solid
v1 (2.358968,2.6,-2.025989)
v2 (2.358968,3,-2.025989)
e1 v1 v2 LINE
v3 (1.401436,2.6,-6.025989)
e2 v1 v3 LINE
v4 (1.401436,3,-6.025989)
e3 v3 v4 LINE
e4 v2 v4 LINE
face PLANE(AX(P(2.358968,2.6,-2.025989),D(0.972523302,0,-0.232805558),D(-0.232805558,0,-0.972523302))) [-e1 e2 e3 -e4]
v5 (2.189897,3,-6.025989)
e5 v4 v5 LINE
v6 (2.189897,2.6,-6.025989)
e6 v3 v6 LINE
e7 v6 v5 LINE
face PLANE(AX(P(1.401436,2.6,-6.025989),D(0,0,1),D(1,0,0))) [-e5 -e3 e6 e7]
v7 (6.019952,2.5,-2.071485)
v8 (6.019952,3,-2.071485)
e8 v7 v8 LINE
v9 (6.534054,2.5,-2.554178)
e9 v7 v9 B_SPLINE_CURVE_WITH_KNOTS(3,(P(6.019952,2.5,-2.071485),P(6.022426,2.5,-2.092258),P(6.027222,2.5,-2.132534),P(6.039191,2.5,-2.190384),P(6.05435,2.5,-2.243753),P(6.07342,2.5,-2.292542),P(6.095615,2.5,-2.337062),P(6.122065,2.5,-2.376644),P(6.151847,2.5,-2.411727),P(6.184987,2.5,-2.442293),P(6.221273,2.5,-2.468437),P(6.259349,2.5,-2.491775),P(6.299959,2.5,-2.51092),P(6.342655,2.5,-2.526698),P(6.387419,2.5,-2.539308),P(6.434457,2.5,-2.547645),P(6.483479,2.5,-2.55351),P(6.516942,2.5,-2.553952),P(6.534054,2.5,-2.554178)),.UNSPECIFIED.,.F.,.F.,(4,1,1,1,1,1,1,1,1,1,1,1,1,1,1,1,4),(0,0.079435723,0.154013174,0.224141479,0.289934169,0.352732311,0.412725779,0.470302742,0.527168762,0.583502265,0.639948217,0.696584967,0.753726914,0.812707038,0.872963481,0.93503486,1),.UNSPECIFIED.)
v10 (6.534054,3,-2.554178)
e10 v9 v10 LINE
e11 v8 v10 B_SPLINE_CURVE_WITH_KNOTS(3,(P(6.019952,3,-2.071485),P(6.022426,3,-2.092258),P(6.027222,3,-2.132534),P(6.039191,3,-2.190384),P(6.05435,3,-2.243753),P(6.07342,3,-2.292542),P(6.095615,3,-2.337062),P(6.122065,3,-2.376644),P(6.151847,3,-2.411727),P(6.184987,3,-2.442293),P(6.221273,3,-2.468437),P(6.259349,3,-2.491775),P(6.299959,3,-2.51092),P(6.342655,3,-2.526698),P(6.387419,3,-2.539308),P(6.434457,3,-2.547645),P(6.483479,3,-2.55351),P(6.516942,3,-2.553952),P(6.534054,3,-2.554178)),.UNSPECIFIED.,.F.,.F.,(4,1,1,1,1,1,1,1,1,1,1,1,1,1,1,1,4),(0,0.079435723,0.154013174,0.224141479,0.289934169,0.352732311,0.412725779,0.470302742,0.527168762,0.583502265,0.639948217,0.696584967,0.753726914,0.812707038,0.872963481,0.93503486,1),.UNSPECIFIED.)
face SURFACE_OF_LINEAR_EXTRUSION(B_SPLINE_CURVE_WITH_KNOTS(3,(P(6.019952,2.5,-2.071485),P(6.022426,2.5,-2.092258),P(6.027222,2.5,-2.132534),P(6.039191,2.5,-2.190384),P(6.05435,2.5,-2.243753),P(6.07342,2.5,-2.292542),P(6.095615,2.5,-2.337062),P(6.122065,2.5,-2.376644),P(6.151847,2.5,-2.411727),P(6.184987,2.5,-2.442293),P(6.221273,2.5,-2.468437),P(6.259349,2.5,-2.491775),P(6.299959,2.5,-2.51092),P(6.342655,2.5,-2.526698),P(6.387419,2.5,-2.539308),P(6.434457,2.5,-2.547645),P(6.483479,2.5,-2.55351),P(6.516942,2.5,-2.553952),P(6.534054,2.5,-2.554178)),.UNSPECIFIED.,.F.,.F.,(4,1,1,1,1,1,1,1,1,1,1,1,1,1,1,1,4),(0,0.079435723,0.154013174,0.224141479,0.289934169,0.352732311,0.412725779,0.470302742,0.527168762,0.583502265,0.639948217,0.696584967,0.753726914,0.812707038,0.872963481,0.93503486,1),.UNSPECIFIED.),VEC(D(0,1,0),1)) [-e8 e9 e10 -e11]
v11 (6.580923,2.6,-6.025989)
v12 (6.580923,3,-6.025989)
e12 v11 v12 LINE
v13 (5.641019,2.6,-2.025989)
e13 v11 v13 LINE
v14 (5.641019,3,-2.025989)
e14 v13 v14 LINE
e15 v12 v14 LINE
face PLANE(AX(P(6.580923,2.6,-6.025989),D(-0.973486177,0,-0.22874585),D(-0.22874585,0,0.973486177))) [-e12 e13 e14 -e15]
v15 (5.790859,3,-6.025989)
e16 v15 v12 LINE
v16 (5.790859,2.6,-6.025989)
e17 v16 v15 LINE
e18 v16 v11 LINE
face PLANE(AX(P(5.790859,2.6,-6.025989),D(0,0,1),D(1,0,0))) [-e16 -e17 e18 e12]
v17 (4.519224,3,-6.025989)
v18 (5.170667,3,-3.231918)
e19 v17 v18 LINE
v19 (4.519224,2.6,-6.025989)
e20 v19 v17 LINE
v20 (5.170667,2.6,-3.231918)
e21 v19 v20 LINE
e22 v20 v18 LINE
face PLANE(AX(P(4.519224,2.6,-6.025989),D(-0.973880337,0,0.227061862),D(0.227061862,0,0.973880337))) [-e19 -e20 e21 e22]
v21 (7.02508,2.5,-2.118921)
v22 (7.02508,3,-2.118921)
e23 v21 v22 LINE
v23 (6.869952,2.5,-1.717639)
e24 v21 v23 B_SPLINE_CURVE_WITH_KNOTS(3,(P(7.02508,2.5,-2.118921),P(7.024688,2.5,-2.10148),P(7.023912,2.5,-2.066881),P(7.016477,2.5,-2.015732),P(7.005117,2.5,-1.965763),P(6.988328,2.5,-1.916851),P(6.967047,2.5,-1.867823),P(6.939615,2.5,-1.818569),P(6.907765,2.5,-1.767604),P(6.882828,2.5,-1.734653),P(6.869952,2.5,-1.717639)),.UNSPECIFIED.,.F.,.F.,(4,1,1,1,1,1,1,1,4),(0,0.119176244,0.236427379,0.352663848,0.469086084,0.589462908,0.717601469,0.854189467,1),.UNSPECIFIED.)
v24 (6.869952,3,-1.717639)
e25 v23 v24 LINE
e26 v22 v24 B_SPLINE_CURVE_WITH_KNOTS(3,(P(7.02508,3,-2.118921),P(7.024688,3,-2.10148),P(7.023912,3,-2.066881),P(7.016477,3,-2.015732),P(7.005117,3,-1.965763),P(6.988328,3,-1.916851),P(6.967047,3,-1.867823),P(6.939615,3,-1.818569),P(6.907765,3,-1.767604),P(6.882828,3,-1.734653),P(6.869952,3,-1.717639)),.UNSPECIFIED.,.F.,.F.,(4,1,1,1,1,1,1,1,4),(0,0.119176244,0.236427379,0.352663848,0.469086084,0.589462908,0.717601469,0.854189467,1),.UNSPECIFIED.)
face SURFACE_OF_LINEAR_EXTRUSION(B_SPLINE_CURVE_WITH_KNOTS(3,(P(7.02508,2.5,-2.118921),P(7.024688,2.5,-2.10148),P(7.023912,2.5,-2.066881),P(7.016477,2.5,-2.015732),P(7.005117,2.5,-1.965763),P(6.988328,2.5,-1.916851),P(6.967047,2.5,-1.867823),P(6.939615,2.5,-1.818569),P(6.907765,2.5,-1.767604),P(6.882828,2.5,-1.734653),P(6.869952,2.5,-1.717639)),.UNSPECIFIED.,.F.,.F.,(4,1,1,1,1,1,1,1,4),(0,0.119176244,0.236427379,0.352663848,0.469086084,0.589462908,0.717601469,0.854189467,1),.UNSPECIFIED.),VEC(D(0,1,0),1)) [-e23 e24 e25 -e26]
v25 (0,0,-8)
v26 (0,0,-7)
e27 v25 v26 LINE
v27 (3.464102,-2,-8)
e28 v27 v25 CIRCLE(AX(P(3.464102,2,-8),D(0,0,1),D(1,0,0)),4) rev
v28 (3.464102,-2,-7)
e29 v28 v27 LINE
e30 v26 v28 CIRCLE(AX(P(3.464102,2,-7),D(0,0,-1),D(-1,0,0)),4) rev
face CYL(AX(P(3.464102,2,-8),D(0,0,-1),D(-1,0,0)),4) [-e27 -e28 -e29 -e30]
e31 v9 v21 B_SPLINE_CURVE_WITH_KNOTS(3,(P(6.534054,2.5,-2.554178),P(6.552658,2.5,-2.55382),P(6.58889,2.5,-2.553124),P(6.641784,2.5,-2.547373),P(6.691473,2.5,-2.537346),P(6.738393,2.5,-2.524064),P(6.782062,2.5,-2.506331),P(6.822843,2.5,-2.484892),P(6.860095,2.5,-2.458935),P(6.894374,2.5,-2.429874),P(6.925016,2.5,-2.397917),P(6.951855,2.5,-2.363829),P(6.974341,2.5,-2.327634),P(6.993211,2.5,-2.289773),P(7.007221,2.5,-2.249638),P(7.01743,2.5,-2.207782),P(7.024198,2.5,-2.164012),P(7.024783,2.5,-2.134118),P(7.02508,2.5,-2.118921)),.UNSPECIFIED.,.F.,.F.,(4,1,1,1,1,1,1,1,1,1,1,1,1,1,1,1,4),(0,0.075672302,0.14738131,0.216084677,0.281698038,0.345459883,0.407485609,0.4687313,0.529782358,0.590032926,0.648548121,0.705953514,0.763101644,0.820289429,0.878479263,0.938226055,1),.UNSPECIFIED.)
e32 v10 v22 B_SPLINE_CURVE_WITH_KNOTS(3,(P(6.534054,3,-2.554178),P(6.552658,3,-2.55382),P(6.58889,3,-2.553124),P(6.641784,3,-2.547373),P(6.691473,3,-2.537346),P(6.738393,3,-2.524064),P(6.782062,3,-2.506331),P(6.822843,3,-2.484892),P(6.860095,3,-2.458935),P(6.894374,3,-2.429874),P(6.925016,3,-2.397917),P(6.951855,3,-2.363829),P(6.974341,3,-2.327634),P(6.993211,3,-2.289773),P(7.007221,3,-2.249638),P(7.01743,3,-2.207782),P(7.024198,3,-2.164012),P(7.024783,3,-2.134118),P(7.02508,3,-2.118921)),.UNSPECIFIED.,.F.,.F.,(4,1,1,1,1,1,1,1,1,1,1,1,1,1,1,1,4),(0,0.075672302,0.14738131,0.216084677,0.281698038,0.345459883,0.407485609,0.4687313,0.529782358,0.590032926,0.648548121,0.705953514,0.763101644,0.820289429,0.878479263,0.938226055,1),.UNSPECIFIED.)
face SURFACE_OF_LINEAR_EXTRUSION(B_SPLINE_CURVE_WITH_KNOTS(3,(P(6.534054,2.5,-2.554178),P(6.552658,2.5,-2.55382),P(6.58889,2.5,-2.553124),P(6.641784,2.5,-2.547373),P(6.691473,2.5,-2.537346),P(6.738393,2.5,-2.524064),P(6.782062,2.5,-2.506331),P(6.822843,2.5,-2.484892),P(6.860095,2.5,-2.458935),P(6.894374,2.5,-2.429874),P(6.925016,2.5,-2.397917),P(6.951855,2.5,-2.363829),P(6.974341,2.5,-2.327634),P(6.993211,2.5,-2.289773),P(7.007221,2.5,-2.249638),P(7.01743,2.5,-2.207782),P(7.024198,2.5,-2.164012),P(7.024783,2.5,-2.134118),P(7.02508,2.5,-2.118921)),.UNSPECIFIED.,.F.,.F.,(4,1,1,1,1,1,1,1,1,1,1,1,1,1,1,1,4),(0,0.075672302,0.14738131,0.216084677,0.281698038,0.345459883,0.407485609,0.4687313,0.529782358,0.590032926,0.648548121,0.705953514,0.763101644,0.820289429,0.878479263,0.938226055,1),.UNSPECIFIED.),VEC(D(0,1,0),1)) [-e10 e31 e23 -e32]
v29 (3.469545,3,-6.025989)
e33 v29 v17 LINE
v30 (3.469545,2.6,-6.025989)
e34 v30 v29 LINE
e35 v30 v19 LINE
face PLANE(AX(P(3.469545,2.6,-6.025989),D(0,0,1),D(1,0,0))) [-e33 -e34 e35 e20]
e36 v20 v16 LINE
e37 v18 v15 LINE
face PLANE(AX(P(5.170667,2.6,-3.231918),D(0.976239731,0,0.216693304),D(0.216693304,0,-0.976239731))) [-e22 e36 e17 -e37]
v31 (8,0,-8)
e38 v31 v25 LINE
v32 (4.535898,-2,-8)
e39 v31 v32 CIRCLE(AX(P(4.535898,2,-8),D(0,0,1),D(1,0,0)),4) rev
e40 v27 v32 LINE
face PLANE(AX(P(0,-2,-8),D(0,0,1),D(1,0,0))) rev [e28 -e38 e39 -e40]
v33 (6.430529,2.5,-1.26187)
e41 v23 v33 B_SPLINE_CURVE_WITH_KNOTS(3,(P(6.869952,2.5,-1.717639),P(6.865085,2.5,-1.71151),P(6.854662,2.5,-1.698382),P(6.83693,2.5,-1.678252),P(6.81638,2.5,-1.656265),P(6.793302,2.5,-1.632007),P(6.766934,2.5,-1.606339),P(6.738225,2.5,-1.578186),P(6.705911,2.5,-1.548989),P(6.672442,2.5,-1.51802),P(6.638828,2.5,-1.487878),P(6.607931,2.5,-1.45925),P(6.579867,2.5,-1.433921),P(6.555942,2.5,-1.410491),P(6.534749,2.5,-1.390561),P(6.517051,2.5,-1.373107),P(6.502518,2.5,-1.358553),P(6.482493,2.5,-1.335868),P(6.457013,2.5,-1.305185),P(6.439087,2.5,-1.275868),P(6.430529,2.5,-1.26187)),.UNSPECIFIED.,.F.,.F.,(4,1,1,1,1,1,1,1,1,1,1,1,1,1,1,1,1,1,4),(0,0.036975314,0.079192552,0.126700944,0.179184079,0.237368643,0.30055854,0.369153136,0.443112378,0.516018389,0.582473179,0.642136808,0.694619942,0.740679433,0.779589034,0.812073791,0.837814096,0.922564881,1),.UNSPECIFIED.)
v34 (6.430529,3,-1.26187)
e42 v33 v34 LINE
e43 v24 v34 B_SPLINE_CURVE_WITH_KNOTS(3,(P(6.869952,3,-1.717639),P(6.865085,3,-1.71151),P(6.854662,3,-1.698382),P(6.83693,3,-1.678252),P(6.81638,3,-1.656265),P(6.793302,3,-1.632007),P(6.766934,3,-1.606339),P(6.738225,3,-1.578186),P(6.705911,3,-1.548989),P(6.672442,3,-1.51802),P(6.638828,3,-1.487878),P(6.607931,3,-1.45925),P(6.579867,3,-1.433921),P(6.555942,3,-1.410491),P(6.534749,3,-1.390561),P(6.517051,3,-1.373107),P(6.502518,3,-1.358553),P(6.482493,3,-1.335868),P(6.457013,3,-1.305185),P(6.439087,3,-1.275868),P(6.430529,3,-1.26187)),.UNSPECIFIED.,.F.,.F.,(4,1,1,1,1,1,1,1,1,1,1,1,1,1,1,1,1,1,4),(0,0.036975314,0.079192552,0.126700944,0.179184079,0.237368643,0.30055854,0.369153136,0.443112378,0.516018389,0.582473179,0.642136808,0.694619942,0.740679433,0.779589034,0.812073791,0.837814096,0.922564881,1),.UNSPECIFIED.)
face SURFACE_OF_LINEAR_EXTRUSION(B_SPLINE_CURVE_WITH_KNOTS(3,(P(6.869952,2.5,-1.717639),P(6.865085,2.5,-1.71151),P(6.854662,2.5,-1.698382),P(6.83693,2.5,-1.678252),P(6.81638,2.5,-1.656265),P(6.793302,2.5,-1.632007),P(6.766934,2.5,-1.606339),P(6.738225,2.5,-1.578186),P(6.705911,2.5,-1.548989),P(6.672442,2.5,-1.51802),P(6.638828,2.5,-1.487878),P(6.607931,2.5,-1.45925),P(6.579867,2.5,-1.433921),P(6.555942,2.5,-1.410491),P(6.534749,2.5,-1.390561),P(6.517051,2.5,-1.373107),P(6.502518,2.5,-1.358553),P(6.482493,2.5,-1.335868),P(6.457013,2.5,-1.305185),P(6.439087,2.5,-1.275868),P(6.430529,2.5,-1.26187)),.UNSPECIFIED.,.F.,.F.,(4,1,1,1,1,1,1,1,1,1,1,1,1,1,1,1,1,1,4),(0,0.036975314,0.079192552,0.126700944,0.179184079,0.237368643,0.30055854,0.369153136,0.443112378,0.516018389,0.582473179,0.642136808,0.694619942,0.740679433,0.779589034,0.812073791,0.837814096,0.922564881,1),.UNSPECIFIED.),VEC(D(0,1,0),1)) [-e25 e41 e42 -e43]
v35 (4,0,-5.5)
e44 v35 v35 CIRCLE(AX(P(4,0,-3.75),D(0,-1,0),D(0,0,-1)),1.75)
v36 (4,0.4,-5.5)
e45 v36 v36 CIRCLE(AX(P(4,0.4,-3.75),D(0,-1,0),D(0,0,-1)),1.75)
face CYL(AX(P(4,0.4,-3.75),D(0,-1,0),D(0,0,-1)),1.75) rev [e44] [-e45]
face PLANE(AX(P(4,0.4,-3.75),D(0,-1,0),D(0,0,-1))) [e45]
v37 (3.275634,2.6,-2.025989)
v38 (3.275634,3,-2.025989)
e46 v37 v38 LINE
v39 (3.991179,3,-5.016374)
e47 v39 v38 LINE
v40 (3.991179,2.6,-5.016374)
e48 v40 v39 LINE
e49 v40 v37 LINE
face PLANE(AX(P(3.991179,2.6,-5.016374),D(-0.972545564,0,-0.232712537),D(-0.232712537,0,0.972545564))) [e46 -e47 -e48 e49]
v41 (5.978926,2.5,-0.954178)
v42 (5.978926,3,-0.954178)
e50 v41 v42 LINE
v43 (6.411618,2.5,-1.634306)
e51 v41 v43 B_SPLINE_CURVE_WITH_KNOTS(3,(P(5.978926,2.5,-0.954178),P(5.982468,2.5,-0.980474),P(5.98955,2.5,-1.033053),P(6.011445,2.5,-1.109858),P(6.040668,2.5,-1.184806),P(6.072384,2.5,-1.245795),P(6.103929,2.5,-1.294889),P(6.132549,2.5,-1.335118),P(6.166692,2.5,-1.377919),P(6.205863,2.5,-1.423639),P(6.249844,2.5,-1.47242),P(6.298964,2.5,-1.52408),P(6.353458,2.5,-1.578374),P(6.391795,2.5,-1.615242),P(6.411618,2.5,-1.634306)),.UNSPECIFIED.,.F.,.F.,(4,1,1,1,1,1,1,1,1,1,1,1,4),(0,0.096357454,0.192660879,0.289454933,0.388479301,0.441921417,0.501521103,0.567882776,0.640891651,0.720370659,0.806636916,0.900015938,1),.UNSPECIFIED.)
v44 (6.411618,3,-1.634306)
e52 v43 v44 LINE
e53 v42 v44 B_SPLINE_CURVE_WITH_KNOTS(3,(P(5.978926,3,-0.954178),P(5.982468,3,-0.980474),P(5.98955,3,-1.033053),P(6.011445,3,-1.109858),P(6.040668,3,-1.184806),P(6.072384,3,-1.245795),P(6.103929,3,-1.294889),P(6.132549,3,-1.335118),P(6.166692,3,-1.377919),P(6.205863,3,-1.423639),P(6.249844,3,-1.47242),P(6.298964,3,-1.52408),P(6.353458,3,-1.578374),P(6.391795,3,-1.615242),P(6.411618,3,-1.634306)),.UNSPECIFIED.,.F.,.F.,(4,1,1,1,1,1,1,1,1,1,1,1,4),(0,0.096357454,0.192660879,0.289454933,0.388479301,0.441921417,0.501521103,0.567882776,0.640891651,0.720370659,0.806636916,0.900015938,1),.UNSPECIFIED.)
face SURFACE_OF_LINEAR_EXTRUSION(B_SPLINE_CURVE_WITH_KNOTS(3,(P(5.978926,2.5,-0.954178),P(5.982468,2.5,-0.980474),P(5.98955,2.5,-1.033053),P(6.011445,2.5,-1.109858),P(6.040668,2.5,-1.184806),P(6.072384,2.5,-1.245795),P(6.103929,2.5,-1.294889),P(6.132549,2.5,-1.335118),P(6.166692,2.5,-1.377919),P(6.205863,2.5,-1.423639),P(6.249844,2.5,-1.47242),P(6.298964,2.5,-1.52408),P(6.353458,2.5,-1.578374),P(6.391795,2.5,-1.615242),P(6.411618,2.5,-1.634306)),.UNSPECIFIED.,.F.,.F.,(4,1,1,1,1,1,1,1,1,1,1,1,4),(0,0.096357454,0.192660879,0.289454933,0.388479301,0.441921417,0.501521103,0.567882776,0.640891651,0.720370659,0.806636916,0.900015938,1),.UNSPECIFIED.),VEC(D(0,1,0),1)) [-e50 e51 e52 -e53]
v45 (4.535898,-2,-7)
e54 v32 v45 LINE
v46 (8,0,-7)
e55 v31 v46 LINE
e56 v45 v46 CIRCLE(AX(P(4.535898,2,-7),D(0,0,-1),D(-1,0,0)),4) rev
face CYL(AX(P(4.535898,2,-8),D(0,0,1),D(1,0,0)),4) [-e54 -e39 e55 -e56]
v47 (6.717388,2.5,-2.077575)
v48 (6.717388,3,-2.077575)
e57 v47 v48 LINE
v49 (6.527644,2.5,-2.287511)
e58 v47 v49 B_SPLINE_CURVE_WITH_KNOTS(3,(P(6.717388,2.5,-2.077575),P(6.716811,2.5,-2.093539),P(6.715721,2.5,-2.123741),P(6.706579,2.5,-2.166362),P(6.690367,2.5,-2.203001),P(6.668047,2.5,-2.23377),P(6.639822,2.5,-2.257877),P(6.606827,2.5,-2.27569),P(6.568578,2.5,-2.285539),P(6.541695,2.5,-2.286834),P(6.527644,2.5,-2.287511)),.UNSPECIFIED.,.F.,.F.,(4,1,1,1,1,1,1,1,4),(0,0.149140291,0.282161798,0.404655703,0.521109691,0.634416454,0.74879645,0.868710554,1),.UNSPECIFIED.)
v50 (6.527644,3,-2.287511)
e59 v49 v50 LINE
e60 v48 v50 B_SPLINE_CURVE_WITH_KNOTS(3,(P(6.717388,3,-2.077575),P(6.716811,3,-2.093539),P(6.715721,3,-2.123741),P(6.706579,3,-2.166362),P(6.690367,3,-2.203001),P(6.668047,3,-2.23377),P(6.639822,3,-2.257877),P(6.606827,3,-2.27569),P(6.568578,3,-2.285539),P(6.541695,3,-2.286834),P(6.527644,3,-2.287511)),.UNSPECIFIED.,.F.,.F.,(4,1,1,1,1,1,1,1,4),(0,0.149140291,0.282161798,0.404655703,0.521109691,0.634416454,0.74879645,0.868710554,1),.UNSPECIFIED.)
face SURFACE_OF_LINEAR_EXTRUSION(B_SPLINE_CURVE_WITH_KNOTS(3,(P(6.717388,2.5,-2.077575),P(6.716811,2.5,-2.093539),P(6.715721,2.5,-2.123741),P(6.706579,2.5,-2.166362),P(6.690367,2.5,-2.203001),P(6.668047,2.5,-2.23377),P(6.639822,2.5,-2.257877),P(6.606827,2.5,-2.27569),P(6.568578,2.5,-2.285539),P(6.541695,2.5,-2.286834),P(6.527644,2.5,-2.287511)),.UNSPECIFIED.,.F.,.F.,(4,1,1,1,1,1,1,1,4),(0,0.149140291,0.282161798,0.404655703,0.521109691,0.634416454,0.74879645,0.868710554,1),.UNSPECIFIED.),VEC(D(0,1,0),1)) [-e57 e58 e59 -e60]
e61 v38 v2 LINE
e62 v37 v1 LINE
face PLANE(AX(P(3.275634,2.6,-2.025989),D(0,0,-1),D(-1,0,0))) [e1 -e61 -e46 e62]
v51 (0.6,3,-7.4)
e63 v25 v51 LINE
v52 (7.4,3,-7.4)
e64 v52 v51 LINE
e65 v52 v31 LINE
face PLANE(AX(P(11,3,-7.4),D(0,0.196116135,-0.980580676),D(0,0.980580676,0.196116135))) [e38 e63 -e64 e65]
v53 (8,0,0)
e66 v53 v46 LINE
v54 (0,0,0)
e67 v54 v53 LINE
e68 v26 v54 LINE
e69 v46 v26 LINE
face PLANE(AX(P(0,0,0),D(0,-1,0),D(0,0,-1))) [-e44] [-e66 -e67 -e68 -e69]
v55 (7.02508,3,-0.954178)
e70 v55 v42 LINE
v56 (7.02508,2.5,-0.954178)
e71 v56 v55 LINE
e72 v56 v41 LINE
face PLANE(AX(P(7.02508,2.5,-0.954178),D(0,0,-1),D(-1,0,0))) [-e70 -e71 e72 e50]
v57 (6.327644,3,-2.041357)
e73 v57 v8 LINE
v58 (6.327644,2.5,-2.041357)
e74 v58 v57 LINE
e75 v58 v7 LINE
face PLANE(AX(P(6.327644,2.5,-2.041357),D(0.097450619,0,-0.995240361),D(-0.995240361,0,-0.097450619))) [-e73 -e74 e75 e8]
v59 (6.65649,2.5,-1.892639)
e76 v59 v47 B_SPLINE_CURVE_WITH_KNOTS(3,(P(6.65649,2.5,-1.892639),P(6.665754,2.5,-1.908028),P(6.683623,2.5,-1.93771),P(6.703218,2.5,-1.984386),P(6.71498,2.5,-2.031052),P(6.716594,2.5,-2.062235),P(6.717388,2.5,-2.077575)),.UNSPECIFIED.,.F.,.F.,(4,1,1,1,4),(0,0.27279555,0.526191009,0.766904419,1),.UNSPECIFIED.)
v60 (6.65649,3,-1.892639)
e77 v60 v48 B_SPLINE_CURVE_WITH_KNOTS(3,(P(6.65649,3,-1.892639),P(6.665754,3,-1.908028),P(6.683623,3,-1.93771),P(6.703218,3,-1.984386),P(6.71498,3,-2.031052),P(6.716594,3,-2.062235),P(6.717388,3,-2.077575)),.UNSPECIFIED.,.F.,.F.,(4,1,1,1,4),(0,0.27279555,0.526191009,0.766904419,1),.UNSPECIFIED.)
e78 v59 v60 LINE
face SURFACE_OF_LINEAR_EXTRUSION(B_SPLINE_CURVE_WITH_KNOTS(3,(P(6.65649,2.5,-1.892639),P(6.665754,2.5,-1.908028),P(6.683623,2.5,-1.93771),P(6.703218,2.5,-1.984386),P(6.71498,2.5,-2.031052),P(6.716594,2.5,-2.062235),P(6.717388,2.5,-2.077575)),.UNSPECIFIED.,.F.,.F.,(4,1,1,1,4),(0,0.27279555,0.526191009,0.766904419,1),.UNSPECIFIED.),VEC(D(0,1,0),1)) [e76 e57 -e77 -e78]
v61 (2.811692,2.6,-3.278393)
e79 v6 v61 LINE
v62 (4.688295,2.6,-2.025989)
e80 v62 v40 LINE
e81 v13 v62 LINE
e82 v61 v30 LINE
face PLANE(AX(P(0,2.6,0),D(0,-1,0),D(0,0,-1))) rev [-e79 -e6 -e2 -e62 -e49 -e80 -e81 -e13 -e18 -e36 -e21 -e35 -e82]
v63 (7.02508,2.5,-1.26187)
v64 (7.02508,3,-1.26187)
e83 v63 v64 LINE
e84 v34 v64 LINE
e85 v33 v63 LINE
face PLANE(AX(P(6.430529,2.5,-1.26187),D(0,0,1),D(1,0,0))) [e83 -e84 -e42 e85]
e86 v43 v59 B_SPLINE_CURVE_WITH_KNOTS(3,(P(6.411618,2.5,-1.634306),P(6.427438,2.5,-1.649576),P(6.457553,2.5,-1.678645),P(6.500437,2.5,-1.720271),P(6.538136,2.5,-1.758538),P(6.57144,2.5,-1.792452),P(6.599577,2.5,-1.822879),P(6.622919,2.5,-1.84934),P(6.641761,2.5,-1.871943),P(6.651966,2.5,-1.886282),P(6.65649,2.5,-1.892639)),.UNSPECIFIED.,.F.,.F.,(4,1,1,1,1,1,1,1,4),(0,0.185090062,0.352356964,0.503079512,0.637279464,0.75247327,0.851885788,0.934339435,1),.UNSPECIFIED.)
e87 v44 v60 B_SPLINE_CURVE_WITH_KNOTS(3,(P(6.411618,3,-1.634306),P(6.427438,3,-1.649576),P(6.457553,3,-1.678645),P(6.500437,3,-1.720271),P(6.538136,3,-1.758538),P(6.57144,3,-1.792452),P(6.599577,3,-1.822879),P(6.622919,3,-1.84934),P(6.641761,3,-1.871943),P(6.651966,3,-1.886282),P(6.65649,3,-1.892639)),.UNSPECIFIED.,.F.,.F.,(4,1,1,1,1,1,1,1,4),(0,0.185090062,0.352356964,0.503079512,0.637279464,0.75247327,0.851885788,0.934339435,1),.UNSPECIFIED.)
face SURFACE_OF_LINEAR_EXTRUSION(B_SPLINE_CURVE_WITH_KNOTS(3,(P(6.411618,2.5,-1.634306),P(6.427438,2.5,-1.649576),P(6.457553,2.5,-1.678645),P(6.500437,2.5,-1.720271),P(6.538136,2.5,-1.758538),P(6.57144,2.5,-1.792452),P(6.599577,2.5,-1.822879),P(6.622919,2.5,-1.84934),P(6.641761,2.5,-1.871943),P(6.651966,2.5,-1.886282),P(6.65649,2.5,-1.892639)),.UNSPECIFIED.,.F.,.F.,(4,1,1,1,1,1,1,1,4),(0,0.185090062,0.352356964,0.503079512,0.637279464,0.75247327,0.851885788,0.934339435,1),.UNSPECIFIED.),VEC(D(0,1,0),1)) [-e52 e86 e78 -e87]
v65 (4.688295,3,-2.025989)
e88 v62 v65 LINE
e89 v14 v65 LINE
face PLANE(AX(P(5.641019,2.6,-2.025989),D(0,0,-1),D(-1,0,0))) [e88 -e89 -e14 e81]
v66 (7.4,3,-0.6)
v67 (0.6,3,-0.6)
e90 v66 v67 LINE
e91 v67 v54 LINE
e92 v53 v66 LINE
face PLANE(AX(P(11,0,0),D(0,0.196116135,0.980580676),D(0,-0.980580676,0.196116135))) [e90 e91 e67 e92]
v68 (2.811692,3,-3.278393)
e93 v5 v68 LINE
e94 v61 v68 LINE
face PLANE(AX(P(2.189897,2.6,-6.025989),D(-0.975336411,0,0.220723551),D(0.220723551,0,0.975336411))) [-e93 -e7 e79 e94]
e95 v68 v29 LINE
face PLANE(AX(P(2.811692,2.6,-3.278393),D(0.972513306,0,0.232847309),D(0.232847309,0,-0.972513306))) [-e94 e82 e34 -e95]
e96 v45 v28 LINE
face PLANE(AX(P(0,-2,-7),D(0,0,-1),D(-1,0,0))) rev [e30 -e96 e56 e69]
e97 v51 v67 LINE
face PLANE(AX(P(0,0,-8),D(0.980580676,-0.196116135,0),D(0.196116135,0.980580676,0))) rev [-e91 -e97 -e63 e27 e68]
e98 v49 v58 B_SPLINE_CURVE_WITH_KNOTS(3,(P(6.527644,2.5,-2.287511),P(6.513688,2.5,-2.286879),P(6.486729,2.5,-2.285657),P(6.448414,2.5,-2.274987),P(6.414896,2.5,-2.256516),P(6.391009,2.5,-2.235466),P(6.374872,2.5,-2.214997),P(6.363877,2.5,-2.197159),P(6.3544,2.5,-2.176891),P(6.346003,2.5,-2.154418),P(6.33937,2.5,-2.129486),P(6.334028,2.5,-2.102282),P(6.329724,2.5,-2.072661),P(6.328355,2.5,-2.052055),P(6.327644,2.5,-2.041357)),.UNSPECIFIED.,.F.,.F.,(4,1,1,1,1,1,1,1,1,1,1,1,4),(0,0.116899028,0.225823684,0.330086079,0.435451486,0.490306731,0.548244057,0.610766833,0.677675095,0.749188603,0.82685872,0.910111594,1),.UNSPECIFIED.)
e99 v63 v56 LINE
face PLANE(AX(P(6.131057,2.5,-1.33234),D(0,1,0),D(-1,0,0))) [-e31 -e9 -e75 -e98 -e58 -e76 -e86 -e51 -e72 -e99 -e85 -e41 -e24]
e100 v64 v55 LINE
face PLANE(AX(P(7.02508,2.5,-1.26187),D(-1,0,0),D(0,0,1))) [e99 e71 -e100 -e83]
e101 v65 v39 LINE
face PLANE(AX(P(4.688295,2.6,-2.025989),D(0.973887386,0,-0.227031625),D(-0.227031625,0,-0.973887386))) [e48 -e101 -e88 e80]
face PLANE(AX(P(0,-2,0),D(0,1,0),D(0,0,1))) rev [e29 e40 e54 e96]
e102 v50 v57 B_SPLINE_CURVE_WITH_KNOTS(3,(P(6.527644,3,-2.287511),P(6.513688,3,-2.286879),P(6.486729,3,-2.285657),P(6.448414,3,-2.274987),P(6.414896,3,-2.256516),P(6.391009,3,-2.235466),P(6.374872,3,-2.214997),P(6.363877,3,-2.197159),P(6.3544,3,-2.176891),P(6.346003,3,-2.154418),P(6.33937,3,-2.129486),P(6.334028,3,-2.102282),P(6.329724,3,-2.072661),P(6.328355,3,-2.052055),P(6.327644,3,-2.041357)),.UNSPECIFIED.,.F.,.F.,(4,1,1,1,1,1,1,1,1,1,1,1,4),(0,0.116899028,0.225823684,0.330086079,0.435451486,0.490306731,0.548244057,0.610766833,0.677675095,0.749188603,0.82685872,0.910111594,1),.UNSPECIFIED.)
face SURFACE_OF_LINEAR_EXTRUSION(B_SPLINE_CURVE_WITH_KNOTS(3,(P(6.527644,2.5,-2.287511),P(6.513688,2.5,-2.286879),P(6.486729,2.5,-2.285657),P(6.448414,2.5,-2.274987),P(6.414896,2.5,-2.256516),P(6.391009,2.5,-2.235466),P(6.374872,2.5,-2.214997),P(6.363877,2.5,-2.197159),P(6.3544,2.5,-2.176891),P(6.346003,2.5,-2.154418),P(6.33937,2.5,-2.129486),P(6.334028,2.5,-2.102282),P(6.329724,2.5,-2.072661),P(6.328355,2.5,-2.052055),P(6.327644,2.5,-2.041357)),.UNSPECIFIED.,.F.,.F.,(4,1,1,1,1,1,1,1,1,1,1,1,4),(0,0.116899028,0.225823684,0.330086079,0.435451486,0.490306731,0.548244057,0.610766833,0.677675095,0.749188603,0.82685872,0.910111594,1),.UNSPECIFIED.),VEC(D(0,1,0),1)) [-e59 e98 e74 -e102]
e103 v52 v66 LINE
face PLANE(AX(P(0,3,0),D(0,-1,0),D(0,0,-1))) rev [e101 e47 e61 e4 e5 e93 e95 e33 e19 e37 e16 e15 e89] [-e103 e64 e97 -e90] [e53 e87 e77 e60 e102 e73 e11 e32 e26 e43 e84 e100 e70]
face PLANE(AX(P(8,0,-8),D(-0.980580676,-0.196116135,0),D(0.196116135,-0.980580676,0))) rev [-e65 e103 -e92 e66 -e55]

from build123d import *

# Parameters (mm, degrees)
SKETCH1_W               = 8
SKETCH1_H               = 8
BOSS_EXTRUDE1_DEPTH     = 3
CUT_EXTRUDE1_DEPTH      = 12.704699911
CUT_EXTRUDE1_DEPTH_BACK = 12.704699911
CUT_EXTRUDE2_DEPTH      = 11
SKETCH4_R               = 1.75
CUT_EXTRUDE3_DEPTH      = 0.4
SKETCH5_W               = 8
SKETCH5_H               = 1
BOSS_EXTRUDE2_DEPTH     = 2
FILLET1_R               = 4
CUT_EXTRUDE4_DEPTH      = 0.4
CUT_EXTRUDE5_DEPTH      = 0.5


with BuildPart() as part:
    # Sketch1 → Boss-Extrude1 (new body)
    with BuildSketch(Plane(origin=(0, 0, 0), x_dir=(1, 0, 0), z_dir=(0, 1, 0))):
        with Locations((4, 4)):
            Rectangle(SKETCH1_W, SKETCH1_H)
    extrude(amount=BOSS_EXTRUDE1_DEPTH)

    # Sketch2 → Cut-Extrude1 (cut, two sides: drawn at the far end of the back side and taken through both)
    with BuildSketch(Plane.XY.offset(-CUT_EXTRUDE1_DEPTH_BACK)):
        Polygon((0, 0), (0.6, 3), (0, 3), align=None)
        Polygon((8, 0), (7.4, 3), (8, 3), align=None)
    extrude(amount=CUT_EXTRUDE1_DEPTH + CUT_EXTRUDE1_DEPTH_BACK, mode=Mode.SUBTRACT)

    # Sketch3 → Cut-Extrude2 (cut)
    with BuildSketch(Plane(origin=(0, 0, 0), x_dir=(0, 0, -1), z_dir=(1, 0, 0))):
        Polygon((0, 0), (0.6, 3), (0, 3), align=None)
        Polygon((8, 3), (7.4, 3), (8, 0), align=None)
    extrude(amount=CUT_EXTRUDE2_DEPTH, mode=Mode.SUBTRACT)

    # Sketch4 → Cut-Extrude3 (cut)
    with BuildSketch(Plane.XZ):
        with Locations(Location((4, -3.75, 0), (0, 0, 270))):
            Circle(SKETCH4_R)
    extrude(amount=-CUT_EXTRUDE3_DEPTH, mode=Mode.SUBTRACT)

    # Sketch5 → Boss-Extrude2 (add)
    with BuildSketch(Plane.XZ):
        with Locations((4, -7.5)):
            Rectangle(SKETCH5_W, SKETCH5_H)
    extrude(amount=BOSS_EXTRUDE2_DEPTH)

    # Fillet1
    # the kernel refuses this fillet: 4 mm, written as the material it takes off along each edge
    with BuildSketch(Plane(origin=(8, -2, -16.660254038), x_dir=(0, 1, 0), z_dir=(0, 0, 1)), Plane(origin=(0, -2, 1.660254038), x_dir=(0, 1, 0), z_dir=(0, 0, -1))) as fillet1_piece_1:
        with BuildLine():
            CenterArc((4, 3.464101615), FILLET1_R, 180, 60)
            Line((0, 3.464101615), (-0.08, 3.464101615))
            Line((-0.08, 3.464101615), (-0.08, 0))
            Line((-0.08, 0), (0, -0.08))
            ThreePointArc((0, -0.08), (1, -0.08), (1.96, -0.069282032))
            Line((1.96, -0.069282032), (2, 0))
        make_face()
    extrude(amount=18.320508076, mode=Mode.SUBTRACT)

    # Sketch6 → Cut-Extrude4 (cut)
    with BuildSketch(Plane(origin=(0, 3, 0), x_dir=(1, 0, 0), z_dir=(0, 1, 0))):
        Polygon((2.358967796, 2.025988971), (1.401435745, 6.025988971), (2.189897284, 6.025988971), (2.811692155, 3.278392817), (3.469544719, 6.025988971), (4.519224207, 6.025988971), (5.170666514, 3.231918458), (5.790858822, 6.025988971), (6.580922925, 6.025988971), (5.641019078, 2.025988971), (4.688294719, 2.025988971), (3.991179335, 5.016373586), (3.275634463, 2.025988971), align=None)
    extrude(amount=-CUT_EXTRUDE4_DEPTH, mode=Mode.SUBTRACT)

    # Sketch7 → Cut-Extrude5 (cut)
    with BuildSketch(Plane(origin=(0, 3, 0), x_dir=(1, 0, 0), z_dir=(0, 1, 0))):
        with BuildLine():
            Line((7.025079926, 1.261869909), (7.025079926, 0.954177602))
            Line((7.025079926, 0.954177602), (5.978926079, 0.954177602))
            add(Edge.make_bspline(
                [(5.978926079, 0.954177602), (5.982468114, 0.980474374), (5.989550197, 1.033053173), (6.011445466, 1.109857564), (6.040668149, 1.184805528), (6.072383822, 1.245794978), (6.103928572, 1.294889387), (6.132549124, 1.335117725), (6.166692393, 1.37791895), (6.205862922, 1.423638586), (6.249844239, 1.472419552), (6.298964472, 1.524080492), (6.353457933, 1.578374089), (6.391795053, 1.615242112), (6.411618387, 1.634305807)],
                knots=[0, 0, 0, 0, 1.156289446, 2.311930546, 3.473459201, 4.661751613, 5.303057008, 6.018253237, 6.81459331, 7.690699809, 8.644447906, 9.679642995, 10.800191253, 12, 12, 12, 12], degree=3))
            add(Edge.make_bspline(
                [(6.411618387, 1.634305807), (6.427437635, 1.649575712), (6.457552822, 1.678645113), (6.500436909, 1.720271317), (6.538136439, 1.758537631), (6.571439659, 1.79245241), (6.599577217, 1.822879209), (6.622919237, 1.849340182), (6.641761343, 1.871943086), (6.651966244, 1.886282382), (6.656490182, 1.89263914)],
                knots=[0, 0, 0, 0, 1.480720495, 2.818855715, 4.024636094, 5.098235712, 6.019786162, 6.815086302, 7.474715479, 8, 8, 8, 8], degree=3))
            add(Edge.make_bspline(
                [(6.656490182, 1.89263914), (6.665754103, 1.908027503), (6.683623134, 1.937709873), (6.703218009, 1.984385935), (6.714979583, 2.031052356), (6.71659359, 2.062234592), (6.717387618, 2.077575038)],
                knots=[0, 0, 0, 0, 1.0911822, 2.104764037, 3.067617678, 4, 4, 4, 4], degree=3))
            add(Edge.make_bspline(
                [(6.717387618, 2.077575038), (6.716811351, 2.093538834), (6.7157211, 2.123741092), (6.706579153, 2.166362064), (6.690367393, 2.203000826), (6.668046783, 2.233769843), (6.639822327, 2.257877251), (6.606827118, 2.275690284), (6.568578157, 2.285538571), (6.541694532, 2.286833928), (6.527644028, 2.287510935)],
                knots=[0, 0, 0, 0, 1.193122327, 2.257294386, 3.237245624, 4.168877528, 5.075331632, 5.990371598, 6.949684428, 8, 8, 8, 8], degree=3))
            add(Edge.make_bspline(
                [(6.527644028, 2.287510935), (6.513688449, 2.286878661), (6.486729282, 2.285657243), (6.448414457, 2.274987105), (6.414896057, 2.256515974), (6.391009062, 2.235466338), (6.374872264, 2.214997095), (6.363877213, 2.197159499), (6.354400337, 2.17689052), (6.346003035, 2.154418352), (6.339370115, 2.129485554), (6.334028373, 2.102282013), (6.329723702, 2.072661336), (6.328354741, 2.052055079), (6.327644028, 2.041357089)],
                knots=[0, 0, 0, 0, 1.402788338, 2.709884207, 3.961032948, 5.225417836, 5.883680772, 6.578928686, 7.329201998, 8.132101139, 8.990263233, 9.922304639, 10.921339128, 12, 12, 12, 12], degree=3))
            Line((6.327644028, 2.041357089), (6.01995172, 2.071485294))
            add(Edge.make_bspline(
                [(6.01995172, 2.071485294), (6.022425519, 2.092258403), (6.027221819, 2.132534142), (6.039191066, 2.190383991), (6.054349674, 2.243753088), (6.073420305, 2.292542389), (6.095614746, 2.337062147), (6.122065099, 2.376644317), (6.15184716, 2.411727355), (6.184986668, 2.44229259), (6.221272944, 2.468437258), (6.259348879, 2.491775386), (6.299958585, 2.510920071), (6.342654946, 2.526698167), (6.387418668, 2.539307895), (6.434456788, 2.547645276), (6.483479006, 2.553509822), (6.516941776, 2.553951654), (6.534054285, 2.554177602)],
                knots=[0, 0, 0, 0, 1.270971563, 2.464210789, 3.586263665, 4.638946707, 5.643716971, 6.603612468, 7.52484387, 8.434700188, 9.336036235, 10.239171475, 11.145359471, 12.059630629, 13.003312604, 13.96741569, 14.960557767, 16, 16, 16, 16], degree=3))
            add(Edge.make_bspline(
                [(6.534054285, 2.554177602), (6.552657792, 2.553820052), (6.58889046, 2.553123679), (6.641783721, 2.547373025), (6.69147314, 2.537345926), (6.738393137, 2.524063615), (6.782061867, 2.506330758), (6.82284322, 2.484892472), (6.860095371, 2.458935129), (6.894373612, 2.429874295), (6.925015616, 2.397916799), (6.95185524, 2.363828728), (6.974341388, 2.327633829), (6.993210719, 2.289773279), (7.007221071, 2.249637846), (7.017429622, 2.207782494), (7.024198302, 2.164011958), (7.024782801, 2.134117674), (7.025079926, 2.118921192)],
                knots=[0, 0, 0, 0, 1.210756838, 2.35810096, 3.457354827, 4.507168606, 5.527358126, 6.519769748, 7.499700793, 8.476517721, 9.440526811, 10.376769937, 11.295256217, 12.209626307, 13.124630862, 14.055668209, 15.011616881, 16, 16, 16, 16], degree=3))
            add(Edge.make_bspline(
                [(7.025079926, 2.118921192), (7.024688468, 2.101480457), (7.023911876, 2.066880717), (7.016476584, 2.015731964), (7.005116907, 1.965762694), (6.988328197, 1.916850789), (6.967047205, 1.867822963), (6.939615495, 1.818569171), (6.907765206, 1.767604004), (6.882827684, 1.7346528), (6.86995172, 1.71763914)],
                knots=[0, 0, 0, 0, 0.953409949, 1.89141903, 2.821310783, 3.752688675, 4.715703262, 5.740811754, 6.833515735, 8, 8, 8, 8], degree=3))
            add(Edge.make_bspline(
                [(6.86995172, 1.71763914), (6.865085171, 1.711509707), (6.854662151, 1.698381883), (6.836929855, 1.678252394), (6.816379649, 1.656264646), (6.793301796, 1.632007081), (6.766933989, 1.606338723), (6.738224942, 1.578186143), (6.705911376, 1.548989439), (6.672442351, 1.518020294), (6.638827847, 1.487878461), (6.607931272, 1.459250402), (6.579866901, 1.433920718), (6.555941744, 1.410491095), (6.534748531, 1.390560588), (6.517051134, 1.373107183), (6.502518393, 1.358553413), (6.482493212, 1.335867777), (6.457013442, 1.305185447), (6.439087381, 1.275867612), (6.430528644, 1.261869909)],
                knots=[0, 0, 0, 0, 0.665555651, 1.425465941, 2.280616993, 3.225313414, 4.272635571, 5.410053715, 6.644756443, 7.976022804, 9.288331007, 10.484517221, 11.558462543, 12.503158964, 13.33222979, 14.032602617, 14.617328242, 15.080653724, 16.606167857, 18, 18, 18, 18], degree=3))
            Line((6.430528644, 1.261869909), (7.025079926, 1.261869909))
        make_face()
    extrude(amount=-CUT_EXTRUDE5_DEPTH, mode=Mode.SUBTRACT)


solid = part.part
